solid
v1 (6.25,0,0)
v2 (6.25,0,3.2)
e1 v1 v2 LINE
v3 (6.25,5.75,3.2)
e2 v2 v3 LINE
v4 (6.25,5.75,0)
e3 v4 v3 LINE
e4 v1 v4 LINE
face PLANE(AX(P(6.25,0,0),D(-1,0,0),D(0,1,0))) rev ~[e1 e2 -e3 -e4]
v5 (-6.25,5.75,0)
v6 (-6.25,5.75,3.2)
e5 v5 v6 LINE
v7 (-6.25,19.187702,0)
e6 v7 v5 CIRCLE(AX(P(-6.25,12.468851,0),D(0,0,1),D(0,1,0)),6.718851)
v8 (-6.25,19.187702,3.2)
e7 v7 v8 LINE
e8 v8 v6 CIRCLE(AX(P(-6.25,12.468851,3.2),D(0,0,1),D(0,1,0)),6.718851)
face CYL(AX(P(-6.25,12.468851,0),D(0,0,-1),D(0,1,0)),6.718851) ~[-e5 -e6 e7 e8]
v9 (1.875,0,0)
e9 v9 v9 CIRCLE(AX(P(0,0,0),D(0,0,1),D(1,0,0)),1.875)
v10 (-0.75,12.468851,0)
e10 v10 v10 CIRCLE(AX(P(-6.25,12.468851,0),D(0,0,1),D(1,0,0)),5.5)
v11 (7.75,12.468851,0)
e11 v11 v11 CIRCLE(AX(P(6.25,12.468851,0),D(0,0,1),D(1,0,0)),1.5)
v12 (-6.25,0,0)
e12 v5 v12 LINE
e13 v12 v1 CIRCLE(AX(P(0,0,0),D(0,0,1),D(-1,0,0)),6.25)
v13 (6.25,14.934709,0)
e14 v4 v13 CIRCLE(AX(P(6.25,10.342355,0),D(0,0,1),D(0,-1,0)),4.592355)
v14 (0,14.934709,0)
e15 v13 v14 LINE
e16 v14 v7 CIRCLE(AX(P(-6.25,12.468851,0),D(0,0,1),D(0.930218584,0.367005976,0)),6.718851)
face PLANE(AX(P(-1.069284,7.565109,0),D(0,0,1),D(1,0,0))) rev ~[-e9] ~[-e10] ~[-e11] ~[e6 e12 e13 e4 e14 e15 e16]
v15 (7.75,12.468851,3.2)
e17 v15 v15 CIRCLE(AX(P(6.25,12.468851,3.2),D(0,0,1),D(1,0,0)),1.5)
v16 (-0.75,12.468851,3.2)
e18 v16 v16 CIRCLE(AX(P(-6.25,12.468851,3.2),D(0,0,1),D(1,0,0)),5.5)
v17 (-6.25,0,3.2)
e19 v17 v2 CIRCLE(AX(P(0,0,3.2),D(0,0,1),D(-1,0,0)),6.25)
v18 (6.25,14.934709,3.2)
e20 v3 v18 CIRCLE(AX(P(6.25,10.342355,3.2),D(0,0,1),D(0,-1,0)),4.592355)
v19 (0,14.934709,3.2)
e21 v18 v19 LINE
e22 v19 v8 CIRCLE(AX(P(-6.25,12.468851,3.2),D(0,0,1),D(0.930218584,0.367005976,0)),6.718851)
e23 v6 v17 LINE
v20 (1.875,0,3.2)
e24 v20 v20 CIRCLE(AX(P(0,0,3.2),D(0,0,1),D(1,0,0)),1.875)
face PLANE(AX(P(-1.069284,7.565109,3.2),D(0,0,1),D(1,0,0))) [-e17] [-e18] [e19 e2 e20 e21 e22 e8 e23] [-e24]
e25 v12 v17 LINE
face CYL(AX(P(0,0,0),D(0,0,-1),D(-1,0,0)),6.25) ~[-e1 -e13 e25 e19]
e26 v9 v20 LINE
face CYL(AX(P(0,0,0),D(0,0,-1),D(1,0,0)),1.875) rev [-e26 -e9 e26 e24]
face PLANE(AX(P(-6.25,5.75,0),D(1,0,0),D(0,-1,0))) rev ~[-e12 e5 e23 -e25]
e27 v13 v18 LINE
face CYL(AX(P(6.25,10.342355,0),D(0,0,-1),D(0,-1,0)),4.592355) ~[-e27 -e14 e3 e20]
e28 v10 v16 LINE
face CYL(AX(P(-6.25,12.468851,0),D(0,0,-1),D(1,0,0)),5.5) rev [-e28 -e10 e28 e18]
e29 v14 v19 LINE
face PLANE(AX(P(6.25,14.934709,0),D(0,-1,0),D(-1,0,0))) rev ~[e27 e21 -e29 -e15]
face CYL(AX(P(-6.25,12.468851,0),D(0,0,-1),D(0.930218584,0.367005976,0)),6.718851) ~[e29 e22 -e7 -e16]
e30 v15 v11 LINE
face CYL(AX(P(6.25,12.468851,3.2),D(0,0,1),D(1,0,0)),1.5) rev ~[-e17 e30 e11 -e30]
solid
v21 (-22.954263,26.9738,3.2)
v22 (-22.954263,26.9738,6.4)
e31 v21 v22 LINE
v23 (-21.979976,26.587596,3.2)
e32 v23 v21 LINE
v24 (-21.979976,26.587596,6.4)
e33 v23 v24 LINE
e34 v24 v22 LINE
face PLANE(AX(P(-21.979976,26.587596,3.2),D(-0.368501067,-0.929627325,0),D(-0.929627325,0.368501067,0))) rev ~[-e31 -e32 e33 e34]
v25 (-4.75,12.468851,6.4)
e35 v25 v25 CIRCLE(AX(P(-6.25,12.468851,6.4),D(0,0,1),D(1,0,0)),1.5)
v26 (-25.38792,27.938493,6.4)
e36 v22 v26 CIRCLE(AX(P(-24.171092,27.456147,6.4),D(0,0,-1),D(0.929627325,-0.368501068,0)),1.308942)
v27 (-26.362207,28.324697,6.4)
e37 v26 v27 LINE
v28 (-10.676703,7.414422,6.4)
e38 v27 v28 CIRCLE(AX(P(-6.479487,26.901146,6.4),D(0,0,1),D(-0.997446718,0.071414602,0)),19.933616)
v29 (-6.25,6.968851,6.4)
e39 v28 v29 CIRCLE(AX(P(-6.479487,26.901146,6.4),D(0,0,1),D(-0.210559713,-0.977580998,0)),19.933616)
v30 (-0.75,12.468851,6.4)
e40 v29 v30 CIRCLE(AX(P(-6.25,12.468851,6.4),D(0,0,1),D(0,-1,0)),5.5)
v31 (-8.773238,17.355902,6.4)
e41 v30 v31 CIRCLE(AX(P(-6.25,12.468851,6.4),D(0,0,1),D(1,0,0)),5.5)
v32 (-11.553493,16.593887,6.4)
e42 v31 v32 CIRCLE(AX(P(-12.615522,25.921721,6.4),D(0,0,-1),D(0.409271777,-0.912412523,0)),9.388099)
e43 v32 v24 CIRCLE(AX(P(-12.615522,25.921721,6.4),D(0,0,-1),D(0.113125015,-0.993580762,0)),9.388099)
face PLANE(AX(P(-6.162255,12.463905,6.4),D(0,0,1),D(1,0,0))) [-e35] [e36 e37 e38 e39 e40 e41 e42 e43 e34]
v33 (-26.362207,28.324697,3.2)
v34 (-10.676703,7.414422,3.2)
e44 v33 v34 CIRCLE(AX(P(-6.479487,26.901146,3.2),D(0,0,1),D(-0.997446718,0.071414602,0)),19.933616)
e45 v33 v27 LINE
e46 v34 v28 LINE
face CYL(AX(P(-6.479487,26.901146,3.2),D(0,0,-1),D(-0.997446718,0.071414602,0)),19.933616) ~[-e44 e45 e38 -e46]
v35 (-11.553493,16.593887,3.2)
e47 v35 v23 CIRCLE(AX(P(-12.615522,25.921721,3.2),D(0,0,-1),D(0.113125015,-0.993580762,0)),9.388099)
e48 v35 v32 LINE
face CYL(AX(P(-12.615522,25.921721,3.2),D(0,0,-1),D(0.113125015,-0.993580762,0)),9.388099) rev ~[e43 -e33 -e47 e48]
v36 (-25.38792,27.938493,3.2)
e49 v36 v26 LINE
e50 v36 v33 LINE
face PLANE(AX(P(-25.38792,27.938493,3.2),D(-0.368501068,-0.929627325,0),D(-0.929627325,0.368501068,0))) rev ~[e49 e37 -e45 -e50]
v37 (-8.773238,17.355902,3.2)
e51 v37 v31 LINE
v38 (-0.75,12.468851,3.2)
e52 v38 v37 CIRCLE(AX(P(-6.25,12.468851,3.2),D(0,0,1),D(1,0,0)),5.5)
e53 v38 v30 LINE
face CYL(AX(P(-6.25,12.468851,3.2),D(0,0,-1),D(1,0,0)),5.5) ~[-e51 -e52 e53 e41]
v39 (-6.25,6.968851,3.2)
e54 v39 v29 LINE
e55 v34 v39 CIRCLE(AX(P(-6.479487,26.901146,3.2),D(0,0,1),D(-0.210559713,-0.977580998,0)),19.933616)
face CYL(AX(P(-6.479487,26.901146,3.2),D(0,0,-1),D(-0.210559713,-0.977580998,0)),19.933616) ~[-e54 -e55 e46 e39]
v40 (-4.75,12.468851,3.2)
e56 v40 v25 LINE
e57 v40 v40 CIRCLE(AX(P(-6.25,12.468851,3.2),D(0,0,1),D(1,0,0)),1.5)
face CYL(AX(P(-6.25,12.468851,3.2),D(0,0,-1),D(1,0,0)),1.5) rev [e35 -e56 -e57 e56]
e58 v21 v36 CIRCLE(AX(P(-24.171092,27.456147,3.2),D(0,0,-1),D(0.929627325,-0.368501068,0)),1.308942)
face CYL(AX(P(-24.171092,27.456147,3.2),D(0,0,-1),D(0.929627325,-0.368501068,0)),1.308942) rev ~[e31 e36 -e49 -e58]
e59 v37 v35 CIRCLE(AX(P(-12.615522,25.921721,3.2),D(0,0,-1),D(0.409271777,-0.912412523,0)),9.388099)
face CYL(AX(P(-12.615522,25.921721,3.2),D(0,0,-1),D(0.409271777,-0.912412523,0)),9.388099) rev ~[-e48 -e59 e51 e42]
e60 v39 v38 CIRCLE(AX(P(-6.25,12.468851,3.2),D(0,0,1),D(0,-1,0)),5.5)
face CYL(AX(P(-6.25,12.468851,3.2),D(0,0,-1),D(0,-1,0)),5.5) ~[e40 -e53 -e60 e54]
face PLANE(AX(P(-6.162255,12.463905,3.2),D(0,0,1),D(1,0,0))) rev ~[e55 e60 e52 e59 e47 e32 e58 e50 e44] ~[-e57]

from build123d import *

# Parameters (mm, degrees)
F0_R     = 1.875
F0_R_2   = 5.5
F1_DEPTH = 3.2
F3_R     = 1.5
F4_DEPTH = 3.2
F2_R     = 1.5
F5_DEPTH = 3.2


with BuildPart() as f1:
    # F0 (on Top) → F1 (new body)
    with BuildSketch(Plane.XY):
        with BuildLine():
            ThreePointArc((-6.25, 19.187701866), (-12.968850933, 12.468850933), (-6.25, 5.75))
            Line((-6.25, 5.75), (-6.25, 0))
            ThreePointArc((-6.25, 0), (0, -6.25), (6.25, 0))
            Line((6.25, 0), (6.25, 5.75))
            ThreePointArc((6.25, 5.75), (10.8423546879, 10.3423546879), (6.25, 14.9347093758))
            Line((6.25, 14.9347093758), (0, 14.9347093758))
            ThreePointArc((0, 14.9347093758), (-2.4701043294, 18.0236098458), (-6.25, 19.187701866))
        make_face()
        Circle(F0_R, mode=Mode.SUBTRACT)
        with Locations((-6.25, 12.468850933)):
            Circle(F0_R_2, mode=Mode.SUBTRACT)
    extrude(amount=F1_DEPTH)

    # F2 (on face) → F5 (cut, through all)
    with BuildSketch(Plane.XY.offset(3.2)):
        with Locations((6.25, 12.468850933)):
            Circle(F2_R)
    extrude(amount=-F5_DEPTH, mode=Mode.SUBTRACT)


with BuildPart() as f4:
    # F3 (on face) → F4 (new body)
    with BuildSketch(Plane.XY.offset(3.2)):
        with BuildLine():
            ThreePointArc((-8.7732377369, 17.3559023265), (-11.5945665243, 11.1705410055), (-6.25, 6.968850933))
            ThreePointArc((-6.25, 6.968850933), (-2.3609127035, 8.5797636365), (-0.75, 12.468850933))
            ThreePointArc((-0.75, 12.468850933), (-3.388864522, 17.1660739186), (-8.7732377369, 17.3559023265))
        make_face()
        with Locations((-6.25, 12.468850933)):
            Circle(F3_R, mode=Mode.SUBTRACT)
        with BuildLine():
            ThreePointArc((-10.6767033745, 7.4144216779), (-8.4758217458, 7.0677474483), (-6.25, 6.968850933))
            ThreePointArc((-6.25, 6.968850933), (-11.5945665243, 11.1705410055), (-8.7732377369, 17.3559023265))
            ThreePointArc((-8.7732377369, 17.3559023265), (-10.1339419751, 16.8675420062), (-11.5534928512, 16.5938868646))
            ThreePointArc((-11.5534928512, 16.5938868646), (-12.9384097457, 11.8299981064), (-10.6767033745, 7.4144216779))
        make_face()
        with BuildLine():
            ThreePointArc((-26.3622067869, 28.3246971667), (-22.4253559313, 14.9396113614), (-10.6767033745, 7.4144216779))
            ThreePointArc((-10.6767033745, 7.4144216779), (-12.9384097457, 11.8299981064), (-11.5534928512, 16.5938868646))
            ThreePointArc((-11.5534928512, 16.5938868646), (-19.1117610171, 19.1441645492), (-21.9799764454, 26.5875961632))
            Line((-21.9799764454, 26.5875961632), (-22.9542631916, 26.9738000713))
            ThreePointArc((-22.9542631916, 26.9738000713), (-24.6534382097, 26.2393182404), (-25.3879200407, 27.9384932585))
            Line((-25.3879200407, 27.9384932585), (-26.3622067869, 28.3246971667))
        make_face()
    extrude(amount=F4_DEPTH)


solid = Compound([f1.part, f4.part])
